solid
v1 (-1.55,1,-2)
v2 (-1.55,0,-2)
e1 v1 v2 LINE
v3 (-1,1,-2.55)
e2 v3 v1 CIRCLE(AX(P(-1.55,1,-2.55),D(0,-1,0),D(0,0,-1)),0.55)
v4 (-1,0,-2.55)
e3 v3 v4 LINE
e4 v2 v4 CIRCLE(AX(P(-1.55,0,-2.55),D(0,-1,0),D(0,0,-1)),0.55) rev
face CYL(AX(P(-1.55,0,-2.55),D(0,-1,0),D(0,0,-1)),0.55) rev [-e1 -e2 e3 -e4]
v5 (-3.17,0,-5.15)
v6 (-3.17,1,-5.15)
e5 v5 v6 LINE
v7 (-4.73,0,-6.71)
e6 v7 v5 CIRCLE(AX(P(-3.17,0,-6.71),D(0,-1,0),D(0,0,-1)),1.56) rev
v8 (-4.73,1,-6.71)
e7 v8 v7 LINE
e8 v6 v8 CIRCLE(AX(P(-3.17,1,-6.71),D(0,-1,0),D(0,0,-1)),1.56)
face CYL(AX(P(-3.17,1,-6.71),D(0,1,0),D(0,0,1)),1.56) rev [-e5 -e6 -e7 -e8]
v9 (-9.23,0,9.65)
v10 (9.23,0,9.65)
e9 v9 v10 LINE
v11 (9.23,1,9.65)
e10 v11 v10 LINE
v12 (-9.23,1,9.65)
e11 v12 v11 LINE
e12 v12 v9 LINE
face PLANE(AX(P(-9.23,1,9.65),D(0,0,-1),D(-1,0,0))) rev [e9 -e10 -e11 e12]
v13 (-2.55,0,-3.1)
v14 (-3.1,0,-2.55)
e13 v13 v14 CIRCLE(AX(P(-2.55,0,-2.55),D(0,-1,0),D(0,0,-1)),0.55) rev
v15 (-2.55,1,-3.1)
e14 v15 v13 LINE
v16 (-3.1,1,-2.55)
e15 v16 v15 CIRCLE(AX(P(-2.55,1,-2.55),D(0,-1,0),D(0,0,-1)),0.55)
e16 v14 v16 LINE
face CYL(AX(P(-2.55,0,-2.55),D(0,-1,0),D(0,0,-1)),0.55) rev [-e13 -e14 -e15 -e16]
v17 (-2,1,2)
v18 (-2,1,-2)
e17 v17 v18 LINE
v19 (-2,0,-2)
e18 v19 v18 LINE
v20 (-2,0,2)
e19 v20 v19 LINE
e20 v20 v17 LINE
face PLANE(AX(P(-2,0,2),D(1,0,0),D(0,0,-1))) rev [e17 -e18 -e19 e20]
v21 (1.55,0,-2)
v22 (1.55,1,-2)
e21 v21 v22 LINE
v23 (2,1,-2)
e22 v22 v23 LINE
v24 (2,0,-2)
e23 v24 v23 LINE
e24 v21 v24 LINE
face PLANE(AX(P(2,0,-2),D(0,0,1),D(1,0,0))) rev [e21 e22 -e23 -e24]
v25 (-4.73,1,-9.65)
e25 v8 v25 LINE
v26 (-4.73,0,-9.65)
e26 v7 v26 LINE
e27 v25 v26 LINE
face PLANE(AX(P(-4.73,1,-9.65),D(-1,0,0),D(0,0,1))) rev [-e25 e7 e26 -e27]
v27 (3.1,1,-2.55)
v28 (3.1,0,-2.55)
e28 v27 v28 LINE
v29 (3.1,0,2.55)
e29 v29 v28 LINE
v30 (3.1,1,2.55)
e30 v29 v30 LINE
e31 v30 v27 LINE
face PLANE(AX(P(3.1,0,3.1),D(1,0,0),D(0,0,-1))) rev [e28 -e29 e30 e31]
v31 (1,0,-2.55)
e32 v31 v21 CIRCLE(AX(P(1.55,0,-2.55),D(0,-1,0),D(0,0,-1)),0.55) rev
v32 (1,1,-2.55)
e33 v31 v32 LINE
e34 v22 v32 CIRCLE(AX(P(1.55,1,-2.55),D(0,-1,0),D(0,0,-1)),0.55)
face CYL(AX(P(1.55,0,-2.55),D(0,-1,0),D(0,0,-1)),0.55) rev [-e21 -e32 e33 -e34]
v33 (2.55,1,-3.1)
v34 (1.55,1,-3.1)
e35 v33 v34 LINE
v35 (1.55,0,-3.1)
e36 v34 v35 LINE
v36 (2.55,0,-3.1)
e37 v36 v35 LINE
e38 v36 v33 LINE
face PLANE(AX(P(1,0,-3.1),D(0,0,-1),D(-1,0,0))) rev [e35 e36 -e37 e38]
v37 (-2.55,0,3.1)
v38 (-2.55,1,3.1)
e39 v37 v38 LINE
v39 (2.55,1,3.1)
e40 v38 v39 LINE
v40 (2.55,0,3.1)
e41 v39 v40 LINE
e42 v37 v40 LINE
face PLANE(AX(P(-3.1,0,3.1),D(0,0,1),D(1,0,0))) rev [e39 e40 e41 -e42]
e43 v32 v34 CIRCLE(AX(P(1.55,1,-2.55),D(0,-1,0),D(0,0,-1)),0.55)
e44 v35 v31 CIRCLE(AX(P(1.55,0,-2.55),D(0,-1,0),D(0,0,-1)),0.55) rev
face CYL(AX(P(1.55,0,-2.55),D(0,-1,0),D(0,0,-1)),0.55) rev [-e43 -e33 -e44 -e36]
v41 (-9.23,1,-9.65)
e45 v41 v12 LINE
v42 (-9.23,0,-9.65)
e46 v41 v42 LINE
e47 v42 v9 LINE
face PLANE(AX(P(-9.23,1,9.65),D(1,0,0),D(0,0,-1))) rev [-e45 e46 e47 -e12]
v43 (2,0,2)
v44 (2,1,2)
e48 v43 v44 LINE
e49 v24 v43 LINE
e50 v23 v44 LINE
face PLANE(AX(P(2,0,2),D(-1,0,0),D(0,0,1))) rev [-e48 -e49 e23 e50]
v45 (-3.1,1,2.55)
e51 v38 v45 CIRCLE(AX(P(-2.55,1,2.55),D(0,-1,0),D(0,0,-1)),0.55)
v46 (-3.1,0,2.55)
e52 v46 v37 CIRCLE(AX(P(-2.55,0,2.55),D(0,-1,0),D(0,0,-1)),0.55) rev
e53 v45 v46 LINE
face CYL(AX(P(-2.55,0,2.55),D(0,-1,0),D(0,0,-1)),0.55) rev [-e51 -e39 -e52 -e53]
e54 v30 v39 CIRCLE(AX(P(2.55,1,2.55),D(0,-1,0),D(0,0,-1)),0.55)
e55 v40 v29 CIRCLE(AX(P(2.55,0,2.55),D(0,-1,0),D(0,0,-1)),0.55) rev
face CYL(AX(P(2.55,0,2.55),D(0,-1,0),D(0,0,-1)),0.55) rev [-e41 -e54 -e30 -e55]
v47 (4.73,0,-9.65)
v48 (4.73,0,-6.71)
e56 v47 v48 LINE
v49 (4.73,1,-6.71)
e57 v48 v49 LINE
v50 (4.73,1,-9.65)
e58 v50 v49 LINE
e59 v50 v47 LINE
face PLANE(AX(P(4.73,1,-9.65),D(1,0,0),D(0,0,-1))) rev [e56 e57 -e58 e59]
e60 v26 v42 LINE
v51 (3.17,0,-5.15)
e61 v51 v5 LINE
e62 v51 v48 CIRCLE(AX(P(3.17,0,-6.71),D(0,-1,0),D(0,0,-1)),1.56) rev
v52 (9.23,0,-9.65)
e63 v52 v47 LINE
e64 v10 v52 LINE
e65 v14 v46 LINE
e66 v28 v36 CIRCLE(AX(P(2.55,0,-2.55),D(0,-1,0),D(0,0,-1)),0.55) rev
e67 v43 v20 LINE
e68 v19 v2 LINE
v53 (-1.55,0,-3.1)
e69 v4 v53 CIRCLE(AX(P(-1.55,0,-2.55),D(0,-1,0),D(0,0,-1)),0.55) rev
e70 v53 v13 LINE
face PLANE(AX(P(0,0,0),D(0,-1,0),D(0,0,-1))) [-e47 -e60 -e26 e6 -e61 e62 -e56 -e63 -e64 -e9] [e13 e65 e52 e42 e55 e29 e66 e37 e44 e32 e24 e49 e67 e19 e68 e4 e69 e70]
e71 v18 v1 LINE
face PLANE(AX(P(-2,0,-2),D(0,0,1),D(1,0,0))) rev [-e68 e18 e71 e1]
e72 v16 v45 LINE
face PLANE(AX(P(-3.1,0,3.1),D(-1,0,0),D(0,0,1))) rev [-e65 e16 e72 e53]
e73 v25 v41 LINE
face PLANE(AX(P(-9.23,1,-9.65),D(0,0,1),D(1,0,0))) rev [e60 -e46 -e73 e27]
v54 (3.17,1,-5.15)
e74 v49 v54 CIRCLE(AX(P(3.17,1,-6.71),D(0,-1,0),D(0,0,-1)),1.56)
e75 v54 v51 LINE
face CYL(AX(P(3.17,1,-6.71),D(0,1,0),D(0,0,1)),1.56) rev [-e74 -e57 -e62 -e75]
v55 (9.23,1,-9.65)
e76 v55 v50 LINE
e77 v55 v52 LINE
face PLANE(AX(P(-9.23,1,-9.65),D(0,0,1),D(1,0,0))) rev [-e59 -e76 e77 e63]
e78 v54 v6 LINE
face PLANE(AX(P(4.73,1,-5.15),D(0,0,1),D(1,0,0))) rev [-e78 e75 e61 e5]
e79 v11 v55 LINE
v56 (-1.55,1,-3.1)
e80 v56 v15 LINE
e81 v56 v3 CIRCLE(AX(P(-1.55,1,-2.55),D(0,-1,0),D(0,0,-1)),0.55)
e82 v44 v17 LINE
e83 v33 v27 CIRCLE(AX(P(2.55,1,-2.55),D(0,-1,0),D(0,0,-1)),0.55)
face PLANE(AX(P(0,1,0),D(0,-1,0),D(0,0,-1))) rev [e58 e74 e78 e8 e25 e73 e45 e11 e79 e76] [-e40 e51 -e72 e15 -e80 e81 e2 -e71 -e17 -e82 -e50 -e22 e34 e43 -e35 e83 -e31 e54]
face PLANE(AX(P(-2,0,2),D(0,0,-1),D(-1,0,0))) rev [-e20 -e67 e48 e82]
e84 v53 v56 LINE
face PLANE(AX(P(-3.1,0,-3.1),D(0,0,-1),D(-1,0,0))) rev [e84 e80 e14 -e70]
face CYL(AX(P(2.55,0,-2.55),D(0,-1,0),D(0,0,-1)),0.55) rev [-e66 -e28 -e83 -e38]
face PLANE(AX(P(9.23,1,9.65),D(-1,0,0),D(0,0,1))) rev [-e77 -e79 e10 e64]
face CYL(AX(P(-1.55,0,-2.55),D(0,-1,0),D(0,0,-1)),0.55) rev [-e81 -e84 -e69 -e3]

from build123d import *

# Parameters (mm, degrees)
SKETCH_1_W          = 18.46
SKETCH_1_H          = 19.3
EXTRUDE_1_DEPTH     = 1
SKETCH_2_W          = 9.46
SKETCH_2_H          = 4.5
CUT_EXTRUDE_1_DEPTH = 14.390870024
FILLET_1_R          = 1.56
CUT_EXTRUDE_2_DEPTH = 14.390870024
FILLET_7_R          = 0.55


with BuildPart() as part:
    # 草图1 → 凸台-拉伸1 (new body)
    with BuildSketch(Plane(origin=(0, 0, 0), x_dir=(1, 0, 0), z_dir=(0, 1, 0))):
        Rectangle(SKETCH_1_W, SKETCH_1_H)
    extrude(amount=EXTRUDE_1_DEPTH)

    # 草图2 → 切除-拉伸1 (cut, through all)
    with BuildSketch(Plane.XZ):
        with Locations((0, -7.4)):
            Rectangle(SKETCH_2_W, SKETCH_2_H)
    extrude(amount=-CUT_EXTRUDE_1_DEPTH, mode=Mode.SUBTRACT)

    # 圆角1
    fillet_1_edges = [part.edges().sort_by_distance(p)[0] for p in [
        (4.73, 0.5, -5.15),
        (-4.73, 0.5, -5.15),
    ]]
    fillet(fillet_1_edges, radius=FILLET_1_R)

    # 草图3 → 切除-拉伸2 (cut, through all)
    with BuildSketch(Plane(origin=(0, 1, 0), x_dir=(1, 0, 0), z_dir=(0, 1, 0))):
        Polygon((1, 3.1), (3.1, 3.1), (3.1, -3.1), (-3.1, -3.1), (-3.1, 3.1), (-1, 3.1), (-1, 2), (-2, 2), (-2, -2), (2, -2), (2, 2), (1, 2), align=None)
    extrude(amount=-CUT_EXTRUDE_2_DEPTH, mode=Mode.SUBTRACT)

    # 圆角7
    fillet_7_edges = [part.edges().sort_by_distance(p)[0] for p in [
        (-1, 0.5, -2),
        (1, 0.5, -2),
        (-3.1, 0.5, 3.1),
        (-1, 0.5, -3.1),
        (-3.1, 0.5, -3.1),
        (1, 0.5, -3.1),
        (3.1, 0.5, -3.1),
        (3.1, 0.5, 3.1),
    ]]
    fillet(fillet_7_edges, radius=FILLET_7_R - 0.0001)  # a hair under: the kernel refuses the full size


solid = part.part
